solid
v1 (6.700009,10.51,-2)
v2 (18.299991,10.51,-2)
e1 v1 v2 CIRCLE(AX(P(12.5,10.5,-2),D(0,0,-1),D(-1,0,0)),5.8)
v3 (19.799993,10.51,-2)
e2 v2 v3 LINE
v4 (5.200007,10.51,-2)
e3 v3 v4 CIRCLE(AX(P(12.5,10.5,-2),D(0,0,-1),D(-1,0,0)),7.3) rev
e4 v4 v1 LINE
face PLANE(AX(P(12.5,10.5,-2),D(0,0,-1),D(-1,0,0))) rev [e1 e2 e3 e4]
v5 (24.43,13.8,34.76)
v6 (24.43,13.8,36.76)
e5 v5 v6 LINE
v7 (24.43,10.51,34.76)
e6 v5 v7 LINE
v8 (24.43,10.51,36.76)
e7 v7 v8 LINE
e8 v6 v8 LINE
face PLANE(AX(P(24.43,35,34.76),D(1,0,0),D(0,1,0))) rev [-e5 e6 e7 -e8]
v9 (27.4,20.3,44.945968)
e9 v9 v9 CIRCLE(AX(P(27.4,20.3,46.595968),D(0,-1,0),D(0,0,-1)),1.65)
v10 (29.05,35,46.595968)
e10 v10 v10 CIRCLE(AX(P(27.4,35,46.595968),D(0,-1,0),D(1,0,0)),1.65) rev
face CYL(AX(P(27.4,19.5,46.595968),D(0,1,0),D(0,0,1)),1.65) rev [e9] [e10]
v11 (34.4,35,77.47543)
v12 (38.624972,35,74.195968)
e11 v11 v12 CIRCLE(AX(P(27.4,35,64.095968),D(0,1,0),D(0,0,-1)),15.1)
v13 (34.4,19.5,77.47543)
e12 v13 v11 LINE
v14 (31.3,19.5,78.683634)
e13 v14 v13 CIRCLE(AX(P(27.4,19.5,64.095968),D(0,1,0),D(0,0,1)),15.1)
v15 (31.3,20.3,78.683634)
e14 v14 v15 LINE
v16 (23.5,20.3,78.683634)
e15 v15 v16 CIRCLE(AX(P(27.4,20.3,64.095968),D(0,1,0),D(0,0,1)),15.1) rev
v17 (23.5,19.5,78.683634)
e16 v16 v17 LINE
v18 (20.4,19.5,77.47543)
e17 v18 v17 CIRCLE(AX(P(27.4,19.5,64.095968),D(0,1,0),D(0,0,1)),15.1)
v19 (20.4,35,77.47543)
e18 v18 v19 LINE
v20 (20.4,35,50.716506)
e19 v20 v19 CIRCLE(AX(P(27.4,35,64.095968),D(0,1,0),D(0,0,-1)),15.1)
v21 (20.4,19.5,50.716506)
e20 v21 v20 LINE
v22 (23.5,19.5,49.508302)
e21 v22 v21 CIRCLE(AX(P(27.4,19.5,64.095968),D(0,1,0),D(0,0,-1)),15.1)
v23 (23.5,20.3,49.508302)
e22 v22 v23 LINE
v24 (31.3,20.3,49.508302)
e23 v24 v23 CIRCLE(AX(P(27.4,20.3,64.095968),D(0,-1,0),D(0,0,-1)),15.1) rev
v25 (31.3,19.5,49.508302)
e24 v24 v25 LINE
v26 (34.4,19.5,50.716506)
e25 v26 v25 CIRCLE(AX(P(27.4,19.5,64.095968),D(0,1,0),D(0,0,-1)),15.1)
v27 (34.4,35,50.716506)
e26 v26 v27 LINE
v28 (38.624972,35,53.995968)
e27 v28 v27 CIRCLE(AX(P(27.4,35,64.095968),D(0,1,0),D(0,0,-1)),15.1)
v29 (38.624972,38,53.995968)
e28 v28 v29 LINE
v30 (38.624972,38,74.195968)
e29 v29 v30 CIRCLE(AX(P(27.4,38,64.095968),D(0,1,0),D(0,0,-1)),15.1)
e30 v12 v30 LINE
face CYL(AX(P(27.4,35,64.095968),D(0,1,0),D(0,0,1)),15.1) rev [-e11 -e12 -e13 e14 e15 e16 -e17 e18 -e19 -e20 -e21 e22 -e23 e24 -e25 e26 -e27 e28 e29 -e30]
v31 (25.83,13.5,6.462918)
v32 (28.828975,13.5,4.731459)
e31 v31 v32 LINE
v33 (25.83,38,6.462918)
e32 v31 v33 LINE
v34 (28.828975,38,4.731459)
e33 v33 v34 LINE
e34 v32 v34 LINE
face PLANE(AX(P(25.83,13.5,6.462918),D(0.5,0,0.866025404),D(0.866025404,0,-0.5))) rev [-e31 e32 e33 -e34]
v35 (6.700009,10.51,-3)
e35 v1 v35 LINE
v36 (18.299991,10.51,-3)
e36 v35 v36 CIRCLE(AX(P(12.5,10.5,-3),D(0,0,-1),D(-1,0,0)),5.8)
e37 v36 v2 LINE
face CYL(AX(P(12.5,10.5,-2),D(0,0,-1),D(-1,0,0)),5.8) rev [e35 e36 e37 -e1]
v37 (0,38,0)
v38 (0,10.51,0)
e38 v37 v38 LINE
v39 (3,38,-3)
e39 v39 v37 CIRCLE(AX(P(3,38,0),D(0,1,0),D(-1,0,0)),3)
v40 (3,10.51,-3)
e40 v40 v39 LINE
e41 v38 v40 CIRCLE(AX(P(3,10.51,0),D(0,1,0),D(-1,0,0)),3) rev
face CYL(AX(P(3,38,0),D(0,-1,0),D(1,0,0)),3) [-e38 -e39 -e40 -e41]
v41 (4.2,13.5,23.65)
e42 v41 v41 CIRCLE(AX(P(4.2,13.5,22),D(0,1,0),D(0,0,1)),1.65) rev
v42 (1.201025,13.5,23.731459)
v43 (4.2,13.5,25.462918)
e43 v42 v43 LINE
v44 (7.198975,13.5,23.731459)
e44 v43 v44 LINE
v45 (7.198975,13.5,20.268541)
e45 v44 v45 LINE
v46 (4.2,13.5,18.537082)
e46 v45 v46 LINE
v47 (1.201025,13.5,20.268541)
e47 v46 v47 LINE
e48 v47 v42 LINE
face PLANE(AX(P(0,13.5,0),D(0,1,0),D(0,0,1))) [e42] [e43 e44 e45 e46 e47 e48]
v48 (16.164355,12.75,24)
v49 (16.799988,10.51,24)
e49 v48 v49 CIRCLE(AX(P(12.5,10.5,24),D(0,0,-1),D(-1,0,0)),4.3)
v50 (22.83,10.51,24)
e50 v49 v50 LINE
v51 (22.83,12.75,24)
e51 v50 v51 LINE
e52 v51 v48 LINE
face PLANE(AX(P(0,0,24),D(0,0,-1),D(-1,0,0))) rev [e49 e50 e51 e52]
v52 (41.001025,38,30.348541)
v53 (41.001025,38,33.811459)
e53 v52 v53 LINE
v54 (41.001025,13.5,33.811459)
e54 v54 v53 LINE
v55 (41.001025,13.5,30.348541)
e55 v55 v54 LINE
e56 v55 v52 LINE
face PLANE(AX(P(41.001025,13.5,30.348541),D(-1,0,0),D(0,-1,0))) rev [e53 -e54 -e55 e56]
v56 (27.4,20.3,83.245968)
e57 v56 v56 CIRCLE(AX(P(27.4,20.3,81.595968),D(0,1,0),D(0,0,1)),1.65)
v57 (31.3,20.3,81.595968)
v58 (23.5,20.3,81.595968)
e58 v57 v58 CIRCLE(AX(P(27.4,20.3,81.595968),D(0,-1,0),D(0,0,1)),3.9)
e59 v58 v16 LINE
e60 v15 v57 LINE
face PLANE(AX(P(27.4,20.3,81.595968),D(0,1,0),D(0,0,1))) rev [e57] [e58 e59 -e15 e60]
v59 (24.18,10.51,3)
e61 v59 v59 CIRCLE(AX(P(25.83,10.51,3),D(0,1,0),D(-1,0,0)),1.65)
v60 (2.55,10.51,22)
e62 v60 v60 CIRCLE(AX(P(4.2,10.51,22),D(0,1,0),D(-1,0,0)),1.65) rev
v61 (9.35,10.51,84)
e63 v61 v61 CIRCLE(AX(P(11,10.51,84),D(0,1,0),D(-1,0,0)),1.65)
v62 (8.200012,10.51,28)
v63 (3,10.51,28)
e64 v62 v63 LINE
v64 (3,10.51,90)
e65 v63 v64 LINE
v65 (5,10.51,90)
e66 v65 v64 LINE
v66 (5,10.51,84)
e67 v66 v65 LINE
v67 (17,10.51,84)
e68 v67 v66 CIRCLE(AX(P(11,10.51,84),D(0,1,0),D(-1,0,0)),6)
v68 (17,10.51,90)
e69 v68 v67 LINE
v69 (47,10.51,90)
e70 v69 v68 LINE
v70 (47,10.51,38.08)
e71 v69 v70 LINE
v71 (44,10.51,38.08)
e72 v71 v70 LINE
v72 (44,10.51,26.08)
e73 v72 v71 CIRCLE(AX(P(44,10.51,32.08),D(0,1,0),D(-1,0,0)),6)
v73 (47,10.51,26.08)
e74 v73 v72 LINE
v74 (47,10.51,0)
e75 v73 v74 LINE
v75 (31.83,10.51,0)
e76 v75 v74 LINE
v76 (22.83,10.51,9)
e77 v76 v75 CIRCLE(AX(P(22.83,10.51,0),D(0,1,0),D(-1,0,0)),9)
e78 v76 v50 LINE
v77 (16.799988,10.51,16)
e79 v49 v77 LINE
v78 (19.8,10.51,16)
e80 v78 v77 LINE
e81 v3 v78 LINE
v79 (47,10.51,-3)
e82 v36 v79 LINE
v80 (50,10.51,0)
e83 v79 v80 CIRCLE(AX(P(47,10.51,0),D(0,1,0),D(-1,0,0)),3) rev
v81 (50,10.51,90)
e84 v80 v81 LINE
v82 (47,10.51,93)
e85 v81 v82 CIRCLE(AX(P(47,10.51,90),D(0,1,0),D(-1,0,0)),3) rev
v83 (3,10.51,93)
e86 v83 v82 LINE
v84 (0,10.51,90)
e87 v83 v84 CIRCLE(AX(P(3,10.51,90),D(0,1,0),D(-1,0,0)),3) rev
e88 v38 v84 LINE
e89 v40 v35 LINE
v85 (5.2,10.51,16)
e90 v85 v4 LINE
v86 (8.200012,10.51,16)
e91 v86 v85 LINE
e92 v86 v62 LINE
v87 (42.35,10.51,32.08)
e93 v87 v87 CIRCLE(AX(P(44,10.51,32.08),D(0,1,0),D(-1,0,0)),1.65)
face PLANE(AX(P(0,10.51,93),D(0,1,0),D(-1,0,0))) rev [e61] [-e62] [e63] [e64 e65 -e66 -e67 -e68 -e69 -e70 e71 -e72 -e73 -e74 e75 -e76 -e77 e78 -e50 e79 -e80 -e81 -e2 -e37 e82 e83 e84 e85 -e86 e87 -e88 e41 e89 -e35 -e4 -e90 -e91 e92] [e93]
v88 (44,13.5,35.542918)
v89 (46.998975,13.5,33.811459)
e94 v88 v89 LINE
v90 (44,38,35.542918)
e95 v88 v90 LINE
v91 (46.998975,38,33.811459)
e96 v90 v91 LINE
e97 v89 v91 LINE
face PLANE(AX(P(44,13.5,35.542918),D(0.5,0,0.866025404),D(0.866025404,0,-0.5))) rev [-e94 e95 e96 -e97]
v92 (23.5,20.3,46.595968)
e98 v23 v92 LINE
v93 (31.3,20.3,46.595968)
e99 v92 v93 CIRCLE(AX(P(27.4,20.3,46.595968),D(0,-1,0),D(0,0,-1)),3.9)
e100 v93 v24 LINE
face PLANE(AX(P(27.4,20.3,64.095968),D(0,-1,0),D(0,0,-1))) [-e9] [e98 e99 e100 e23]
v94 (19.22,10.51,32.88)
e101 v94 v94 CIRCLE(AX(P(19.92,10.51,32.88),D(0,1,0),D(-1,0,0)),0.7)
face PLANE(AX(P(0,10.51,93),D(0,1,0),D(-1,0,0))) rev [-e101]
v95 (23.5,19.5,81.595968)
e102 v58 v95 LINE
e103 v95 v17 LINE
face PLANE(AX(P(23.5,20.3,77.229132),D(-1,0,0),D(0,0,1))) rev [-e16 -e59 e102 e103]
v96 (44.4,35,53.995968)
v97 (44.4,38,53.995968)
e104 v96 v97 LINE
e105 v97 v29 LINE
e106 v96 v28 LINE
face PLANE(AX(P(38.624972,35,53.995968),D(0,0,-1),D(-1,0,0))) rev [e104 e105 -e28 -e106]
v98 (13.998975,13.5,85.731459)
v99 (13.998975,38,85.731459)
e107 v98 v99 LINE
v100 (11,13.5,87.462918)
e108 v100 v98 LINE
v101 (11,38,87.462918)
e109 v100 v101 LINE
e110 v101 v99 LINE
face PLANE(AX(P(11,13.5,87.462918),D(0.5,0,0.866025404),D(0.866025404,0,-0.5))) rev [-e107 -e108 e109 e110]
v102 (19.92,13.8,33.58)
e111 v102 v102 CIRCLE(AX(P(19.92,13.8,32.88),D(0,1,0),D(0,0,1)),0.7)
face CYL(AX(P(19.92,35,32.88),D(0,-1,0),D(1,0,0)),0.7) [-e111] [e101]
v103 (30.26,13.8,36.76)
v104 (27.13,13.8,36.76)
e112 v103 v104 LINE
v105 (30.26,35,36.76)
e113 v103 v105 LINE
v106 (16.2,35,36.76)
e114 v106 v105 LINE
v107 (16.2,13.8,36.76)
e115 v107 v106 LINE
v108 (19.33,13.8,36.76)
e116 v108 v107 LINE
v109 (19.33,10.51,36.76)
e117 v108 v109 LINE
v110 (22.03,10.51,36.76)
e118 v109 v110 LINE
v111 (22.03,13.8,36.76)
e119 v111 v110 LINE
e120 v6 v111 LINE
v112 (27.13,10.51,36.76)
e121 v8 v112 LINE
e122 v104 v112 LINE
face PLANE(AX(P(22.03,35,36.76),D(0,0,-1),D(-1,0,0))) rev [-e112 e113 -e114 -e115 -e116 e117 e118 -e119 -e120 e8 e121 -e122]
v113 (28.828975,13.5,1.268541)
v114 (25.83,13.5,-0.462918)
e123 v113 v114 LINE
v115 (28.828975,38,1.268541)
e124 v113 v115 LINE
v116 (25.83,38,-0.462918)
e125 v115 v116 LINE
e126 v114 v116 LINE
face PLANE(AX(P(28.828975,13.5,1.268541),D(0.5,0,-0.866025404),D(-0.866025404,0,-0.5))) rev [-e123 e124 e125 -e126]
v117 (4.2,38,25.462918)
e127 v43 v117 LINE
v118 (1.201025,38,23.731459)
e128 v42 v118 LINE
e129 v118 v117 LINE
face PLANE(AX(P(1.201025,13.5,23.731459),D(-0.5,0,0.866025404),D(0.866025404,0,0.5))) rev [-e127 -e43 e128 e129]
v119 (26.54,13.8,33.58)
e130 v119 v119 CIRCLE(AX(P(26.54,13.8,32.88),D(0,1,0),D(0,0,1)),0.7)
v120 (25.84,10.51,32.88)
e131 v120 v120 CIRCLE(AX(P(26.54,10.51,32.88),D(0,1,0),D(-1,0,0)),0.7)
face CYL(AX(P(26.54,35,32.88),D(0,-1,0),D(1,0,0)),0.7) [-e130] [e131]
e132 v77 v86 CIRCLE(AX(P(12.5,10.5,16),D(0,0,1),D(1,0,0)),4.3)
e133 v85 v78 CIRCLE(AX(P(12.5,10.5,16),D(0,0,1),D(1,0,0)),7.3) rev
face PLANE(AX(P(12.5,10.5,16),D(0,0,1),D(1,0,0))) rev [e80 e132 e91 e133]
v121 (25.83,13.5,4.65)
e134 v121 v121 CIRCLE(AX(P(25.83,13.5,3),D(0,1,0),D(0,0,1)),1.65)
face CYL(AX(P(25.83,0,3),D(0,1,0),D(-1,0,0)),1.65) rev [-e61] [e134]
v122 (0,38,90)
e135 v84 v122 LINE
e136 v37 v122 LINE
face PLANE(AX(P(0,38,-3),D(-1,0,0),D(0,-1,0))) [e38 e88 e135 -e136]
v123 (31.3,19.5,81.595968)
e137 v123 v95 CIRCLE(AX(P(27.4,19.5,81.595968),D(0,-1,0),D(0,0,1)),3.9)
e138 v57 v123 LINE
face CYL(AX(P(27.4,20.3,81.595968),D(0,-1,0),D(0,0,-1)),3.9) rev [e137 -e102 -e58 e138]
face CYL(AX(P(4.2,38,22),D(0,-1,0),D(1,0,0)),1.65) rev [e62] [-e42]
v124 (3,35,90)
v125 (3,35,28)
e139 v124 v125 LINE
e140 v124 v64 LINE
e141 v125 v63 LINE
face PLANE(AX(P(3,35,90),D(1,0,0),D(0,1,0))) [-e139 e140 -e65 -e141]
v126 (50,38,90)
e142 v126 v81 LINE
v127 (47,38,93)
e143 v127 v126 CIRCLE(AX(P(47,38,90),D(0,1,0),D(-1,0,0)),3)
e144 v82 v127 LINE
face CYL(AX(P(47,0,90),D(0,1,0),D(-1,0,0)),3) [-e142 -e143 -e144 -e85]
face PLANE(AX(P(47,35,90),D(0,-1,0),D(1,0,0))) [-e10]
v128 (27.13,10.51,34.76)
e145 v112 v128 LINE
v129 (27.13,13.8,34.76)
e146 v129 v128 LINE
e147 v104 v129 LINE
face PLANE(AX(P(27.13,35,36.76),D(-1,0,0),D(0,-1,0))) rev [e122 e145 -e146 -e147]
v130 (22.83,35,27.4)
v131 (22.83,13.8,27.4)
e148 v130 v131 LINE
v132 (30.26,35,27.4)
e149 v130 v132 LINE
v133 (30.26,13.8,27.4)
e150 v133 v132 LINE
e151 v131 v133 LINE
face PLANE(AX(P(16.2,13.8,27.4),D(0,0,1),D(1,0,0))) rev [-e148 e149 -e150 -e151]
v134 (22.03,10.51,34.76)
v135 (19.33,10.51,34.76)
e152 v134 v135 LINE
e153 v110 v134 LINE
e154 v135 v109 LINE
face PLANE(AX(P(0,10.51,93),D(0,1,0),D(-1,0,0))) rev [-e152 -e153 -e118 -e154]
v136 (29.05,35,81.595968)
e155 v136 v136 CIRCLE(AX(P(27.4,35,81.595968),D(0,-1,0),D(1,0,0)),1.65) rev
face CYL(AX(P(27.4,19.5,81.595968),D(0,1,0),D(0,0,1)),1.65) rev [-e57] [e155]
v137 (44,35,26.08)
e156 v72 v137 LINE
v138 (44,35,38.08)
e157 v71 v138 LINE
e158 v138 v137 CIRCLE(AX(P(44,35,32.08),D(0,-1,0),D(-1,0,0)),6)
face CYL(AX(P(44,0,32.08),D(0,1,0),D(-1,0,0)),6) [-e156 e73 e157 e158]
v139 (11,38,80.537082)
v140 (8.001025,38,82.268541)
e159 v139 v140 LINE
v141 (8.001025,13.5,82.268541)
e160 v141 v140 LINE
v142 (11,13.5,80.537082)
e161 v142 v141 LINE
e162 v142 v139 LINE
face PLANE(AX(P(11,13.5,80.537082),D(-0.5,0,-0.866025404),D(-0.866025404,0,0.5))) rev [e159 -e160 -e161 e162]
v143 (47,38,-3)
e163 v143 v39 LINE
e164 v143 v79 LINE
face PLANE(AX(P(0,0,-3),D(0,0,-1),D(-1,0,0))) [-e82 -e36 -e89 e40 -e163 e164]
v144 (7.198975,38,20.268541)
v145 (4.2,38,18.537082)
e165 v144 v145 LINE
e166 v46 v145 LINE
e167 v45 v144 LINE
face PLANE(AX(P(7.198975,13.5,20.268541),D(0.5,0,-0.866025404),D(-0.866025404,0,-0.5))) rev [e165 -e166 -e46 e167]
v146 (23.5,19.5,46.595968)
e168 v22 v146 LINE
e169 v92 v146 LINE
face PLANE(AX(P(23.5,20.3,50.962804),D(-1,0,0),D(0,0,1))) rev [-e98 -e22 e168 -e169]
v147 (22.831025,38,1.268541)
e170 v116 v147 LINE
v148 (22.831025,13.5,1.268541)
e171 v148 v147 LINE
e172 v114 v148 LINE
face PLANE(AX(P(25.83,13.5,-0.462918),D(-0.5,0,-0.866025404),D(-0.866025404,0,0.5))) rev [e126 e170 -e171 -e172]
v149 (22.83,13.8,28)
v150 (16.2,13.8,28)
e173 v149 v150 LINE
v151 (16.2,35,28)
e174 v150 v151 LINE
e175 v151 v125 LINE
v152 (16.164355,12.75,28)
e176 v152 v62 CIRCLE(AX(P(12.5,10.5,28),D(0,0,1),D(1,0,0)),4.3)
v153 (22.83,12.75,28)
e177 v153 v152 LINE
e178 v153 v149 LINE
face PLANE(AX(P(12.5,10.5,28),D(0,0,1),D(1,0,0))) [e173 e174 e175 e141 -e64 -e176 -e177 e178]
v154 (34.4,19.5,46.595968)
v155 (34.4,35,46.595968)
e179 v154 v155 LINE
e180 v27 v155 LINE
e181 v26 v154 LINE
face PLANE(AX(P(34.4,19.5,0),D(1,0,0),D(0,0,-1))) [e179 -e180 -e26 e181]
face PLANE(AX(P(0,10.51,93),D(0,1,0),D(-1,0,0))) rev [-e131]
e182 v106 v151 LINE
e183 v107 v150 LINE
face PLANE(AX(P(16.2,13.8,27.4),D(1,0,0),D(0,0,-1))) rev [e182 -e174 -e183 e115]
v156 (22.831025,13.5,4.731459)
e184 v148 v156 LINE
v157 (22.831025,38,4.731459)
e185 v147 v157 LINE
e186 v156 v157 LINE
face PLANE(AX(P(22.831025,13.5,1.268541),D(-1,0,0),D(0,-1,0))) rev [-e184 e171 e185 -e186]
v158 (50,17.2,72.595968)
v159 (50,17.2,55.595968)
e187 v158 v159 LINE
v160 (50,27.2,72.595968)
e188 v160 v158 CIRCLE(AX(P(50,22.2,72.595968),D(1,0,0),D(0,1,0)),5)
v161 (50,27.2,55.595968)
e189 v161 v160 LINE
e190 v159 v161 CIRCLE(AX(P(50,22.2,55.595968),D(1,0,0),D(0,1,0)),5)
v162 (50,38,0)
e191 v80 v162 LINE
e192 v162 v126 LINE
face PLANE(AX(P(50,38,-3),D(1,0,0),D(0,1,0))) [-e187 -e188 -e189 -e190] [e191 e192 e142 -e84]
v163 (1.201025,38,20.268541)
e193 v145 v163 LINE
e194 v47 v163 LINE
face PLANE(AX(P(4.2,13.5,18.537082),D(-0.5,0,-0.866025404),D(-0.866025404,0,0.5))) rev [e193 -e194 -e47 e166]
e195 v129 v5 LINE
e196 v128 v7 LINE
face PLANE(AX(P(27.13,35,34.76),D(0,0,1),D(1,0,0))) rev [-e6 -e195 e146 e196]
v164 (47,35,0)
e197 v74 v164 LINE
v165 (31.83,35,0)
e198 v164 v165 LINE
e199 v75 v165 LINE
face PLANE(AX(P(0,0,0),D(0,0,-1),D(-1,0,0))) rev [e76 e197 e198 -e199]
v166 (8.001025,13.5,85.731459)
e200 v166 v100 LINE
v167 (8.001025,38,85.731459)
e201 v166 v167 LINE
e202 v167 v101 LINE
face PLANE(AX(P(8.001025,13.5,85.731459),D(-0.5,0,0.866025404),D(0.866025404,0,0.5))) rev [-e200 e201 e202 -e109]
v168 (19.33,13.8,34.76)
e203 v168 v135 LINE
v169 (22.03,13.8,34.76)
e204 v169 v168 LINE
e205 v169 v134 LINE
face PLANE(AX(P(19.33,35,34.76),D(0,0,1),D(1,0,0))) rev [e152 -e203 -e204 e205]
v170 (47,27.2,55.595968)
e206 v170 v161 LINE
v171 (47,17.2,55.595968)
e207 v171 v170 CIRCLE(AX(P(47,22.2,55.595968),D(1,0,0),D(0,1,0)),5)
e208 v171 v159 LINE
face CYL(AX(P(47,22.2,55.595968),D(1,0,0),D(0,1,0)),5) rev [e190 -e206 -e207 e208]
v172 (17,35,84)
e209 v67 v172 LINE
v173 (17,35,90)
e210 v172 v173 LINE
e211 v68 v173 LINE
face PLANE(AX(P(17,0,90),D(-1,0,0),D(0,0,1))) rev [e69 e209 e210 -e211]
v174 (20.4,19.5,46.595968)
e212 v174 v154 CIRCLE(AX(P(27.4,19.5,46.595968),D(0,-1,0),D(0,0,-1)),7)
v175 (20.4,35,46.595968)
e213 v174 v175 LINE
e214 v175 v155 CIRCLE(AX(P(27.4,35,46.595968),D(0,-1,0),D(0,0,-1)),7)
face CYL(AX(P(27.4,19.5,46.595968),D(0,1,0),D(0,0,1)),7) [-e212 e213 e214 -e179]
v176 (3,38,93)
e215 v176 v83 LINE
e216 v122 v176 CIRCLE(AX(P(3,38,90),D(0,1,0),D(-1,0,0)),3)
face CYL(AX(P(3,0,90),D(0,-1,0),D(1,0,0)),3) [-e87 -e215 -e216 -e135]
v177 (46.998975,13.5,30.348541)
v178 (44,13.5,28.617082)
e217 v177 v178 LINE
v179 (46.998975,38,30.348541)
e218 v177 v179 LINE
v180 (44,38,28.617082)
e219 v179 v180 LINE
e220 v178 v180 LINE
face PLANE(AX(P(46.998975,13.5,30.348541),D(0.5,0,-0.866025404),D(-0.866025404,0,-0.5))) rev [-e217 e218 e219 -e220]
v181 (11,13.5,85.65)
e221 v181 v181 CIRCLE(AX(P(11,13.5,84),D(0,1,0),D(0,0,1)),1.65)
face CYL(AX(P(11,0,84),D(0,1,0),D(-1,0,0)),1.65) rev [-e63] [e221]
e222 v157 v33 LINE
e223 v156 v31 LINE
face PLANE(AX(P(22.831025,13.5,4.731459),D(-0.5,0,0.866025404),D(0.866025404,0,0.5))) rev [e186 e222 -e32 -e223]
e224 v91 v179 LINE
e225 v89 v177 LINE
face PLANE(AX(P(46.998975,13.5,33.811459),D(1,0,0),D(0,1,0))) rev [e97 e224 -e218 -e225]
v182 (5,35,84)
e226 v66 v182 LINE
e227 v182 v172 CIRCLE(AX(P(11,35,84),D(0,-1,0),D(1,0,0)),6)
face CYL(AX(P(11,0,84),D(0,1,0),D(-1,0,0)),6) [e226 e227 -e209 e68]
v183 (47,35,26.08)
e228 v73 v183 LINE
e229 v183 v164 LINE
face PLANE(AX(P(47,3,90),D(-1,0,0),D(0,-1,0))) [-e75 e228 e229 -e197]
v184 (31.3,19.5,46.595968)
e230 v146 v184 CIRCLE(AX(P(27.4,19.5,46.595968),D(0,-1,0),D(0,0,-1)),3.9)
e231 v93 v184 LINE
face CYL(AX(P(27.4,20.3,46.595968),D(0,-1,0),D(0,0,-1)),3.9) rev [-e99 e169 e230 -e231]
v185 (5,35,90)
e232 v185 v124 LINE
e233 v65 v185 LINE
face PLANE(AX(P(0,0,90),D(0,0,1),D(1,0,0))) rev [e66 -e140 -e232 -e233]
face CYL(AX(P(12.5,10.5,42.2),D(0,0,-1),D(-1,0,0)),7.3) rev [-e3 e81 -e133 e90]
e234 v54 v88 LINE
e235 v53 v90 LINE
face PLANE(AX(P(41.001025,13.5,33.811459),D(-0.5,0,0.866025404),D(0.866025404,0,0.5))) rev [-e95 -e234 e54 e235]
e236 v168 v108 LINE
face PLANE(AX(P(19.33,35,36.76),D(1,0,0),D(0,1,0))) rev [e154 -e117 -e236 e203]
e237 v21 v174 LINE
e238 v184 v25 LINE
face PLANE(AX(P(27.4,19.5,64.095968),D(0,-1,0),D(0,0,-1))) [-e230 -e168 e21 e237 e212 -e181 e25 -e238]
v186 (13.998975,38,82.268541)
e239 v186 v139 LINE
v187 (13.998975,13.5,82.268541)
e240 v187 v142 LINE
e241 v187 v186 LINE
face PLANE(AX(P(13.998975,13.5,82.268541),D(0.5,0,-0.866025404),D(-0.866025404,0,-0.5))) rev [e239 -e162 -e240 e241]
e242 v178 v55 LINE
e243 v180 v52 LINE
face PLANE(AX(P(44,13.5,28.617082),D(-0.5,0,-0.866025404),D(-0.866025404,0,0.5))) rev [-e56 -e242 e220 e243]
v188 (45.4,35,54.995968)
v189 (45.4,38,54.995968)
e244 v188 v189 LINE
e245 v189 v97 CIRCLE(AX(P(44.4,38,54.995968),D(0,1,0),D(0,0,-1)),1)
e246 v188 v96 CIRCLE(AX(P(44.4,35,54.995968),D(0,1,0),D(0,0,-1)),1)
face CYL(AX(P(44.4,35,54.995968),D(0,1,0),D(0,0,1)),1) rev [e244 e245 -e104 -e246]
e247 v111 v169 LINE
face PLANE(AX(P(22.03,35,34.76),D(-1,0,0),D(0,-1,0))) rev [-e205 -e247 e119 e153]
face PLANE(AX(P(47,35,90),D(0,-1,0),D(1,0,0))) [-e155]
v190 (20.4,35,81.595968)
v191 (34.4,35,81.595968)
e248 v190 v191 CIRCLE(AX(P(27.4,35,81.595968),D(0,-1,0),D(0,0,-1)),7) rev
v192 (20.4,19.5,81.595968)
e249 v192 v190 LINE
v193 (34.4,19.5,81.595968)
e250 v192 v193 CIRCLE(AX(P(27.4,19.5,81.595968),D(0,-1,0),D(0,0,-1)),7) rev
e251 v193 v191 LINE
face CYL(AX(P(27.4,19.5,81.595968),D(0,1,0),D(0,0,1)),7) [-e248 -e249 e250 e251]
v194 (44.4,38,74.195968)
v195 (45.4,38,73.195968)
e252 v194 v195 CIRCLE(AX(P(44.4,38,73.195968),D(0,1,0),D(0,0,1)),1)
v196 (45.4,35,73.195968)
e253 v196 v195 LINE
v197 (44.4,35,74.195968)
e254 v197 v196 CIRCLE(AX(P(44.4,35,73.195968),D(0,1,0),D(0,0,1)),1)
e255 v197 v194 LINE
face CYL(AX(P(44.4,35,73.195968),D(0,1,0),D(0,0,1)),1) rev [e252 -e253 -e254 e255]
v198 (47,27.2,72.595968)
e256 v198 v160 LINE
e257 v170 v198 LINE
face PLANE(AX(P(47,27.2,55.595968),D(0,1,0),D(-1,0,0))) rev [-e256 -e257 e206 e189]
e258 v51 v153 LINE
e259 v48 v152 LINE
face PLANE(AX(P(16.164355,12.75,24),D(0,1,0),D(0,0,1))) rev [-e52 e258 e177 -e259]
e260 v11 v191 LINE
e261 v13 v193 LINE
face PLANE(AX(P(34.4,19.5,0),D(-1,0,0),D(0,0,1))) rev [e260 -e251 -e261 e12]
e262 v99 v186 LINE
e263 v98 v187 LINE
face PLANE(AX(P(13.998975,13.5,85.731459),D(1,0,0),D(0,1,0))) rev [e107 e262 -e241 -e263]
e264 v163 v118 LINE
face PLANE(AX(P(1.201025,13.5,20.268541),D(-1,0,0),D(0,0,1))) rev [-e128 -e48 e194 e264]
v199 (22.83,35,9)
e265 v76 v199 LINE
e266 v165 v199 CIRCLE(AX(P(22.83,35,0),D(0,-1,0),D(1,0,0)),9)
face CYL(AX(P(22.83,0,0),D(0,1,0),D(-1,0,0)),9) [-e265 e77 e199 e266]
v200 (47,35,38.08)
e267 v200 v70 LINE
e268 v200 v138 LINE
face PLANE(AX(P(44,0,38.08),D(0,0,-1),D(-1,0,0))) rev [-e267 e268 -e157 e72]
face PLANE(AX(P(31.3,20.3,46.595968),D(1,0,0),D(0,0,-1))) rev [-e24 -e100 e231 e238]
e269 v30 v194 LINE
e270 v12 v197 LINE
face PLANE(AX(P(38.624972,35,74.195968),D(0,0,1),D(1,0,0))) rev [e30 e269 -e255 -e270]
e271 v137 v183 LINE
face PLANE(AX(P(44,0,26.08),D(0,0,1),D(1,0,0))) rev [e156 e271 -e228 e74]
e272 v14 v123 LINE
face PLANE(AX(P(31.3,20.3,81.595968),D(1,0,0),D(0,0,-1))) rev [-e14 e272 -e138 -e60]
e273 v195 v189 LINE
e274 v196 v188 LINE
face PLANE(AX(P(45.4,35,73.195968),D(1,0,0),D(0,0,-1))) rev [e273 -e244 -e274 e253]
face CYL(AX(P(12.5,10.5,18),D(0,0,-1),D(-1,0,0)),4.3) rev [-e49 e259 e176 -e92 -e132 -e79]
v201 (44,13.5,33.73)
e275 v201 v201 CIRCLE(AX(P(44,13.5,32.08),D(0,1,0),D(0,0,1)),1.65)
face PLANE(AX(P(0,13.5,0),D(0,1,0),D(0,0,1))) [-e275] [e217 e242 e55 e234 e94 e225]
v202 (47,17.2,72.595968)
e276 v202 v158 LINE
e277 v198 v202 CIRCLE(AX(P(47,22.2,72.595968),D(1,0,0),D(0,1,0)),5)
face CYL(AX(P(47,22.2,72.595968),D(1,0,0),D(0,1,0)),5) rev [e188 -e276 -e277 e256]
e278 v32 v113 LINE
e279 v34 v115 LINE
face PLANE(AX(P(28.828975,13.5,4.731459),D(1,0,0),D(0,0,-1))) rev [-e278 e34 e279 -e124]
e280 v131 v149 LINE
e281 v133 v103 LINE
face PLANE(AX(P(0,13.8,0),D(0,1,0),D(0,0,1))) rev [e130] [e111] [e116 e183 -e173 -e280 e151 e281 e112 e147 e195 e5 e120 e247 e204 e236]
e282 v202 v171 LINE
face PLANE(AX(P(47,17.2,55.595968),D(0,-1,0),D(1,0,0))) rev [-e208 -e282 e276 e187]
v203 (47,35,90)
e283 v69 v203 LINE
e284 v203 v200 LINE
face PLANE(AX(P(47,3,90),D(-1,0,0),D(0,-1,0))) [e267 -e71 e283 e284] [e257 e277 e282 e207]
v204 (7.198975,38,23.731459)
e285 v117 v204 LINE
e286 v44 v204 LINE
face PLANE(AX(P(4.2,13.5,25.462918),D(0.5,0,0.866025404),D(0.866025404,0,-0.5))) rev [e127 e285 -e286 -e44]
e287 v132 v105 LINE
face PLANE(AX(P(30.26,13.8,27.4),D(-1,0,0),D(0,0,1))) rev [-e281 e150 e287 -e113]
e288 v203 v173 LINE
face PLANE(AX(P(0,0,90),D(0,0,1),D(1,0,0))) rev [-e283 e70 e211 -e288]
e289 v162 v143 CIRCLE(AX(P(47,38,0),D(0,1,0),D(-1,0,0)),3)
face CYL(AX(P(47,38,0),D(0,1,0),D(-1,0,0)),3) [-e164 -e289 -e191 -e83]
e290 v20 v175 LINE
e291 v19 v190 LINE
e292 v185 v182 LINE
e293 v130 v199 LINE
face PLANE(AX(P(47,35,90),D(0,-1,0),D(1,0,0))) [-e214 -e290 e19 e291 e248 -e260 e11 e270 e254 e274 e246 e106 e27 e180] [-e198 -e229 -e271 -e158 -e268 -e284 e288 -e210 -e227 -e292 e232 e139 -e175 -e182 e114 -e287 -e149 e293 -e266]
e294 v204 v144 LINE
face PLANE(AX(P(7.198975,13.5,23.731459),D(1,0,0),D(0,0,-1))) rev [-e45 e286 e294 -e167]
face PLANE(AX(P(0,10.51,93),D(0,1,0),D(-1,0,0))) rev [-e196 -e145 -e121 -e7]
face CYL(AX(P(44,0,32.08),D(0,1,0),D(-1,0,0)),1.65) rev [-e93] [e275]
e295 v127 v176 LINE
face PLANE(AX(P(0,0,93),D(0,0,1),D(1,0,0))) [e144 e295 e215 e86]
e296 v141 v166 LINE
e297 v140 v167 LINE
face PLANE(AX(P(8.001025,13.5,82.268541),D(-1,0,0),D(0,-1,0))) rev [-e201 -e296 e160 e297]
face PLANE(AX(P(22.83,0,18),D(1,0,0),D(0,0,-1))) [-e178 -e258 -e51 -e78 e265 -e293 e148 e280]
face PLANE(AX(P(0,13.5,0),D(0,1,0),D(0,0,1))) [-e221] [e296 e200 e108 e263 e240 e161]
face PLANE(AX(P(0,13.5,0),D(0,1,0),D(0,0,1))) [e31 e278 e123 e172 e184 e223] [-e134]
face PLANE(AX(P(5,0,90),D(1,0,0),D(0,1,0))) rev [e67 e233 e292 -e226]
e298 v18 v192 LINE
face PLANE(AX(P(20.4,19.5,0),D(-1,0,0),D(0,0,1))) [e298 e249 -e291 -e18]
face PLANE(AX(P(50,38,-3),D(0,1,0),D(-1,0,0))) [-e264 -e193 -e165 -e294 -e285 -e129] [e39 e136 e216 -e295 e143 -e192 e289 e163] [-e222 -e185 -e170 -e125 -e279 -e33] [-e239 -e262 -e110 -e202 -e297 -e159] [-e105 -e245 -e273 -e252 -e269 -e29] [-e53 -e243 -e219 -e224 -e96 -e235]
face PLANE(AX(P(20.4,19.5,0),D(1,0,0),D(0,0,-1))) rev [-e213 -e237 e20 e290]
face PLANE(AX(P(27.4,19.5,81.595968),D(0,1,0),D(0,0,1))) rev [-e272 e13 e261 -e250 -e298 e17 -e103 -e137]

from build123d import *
from build123d.topology import SkipClean

# Parameters (mm, degrees)
SKETCH_1_W               = 50
SKETCH_1_H               = 38
EXTRUDE_1_DEPTH          = 3
SKETCH_2_W               = 50
SKETCH_2_H               = 38
SKETCH_2_W_2             = 44
SKETCH_2_H_2             = 32
EXTRUDE_2_DEPTH          = 90
SKETCH_4_R               = 7.3
CUT_EXTRUDE_1_DEPTH      = 45.2
SKETCH_5_R               = 10.3
SKETCH_5_R_2             = 7.3
EXTRUDE_3_DEPTH          = 16
SKETCH_6_R               = 8.3
SKETCH_6_R_2             = 5.8
EXTRUDE_5_DEPTH          = 1
SKETCH_7_R               = 4.3
EXTRUDE_6_DEPTH          = 2
SKETCH_8_R               = 6.3
SKETCH_8_R_2             = 4.3
EXTRUDE_7_DEPTH          = 10
SKETCH_9_W               = 2.635644668
SKETCH_9_H               = 4.5
CUT_EXTRUDE_2_DEPTH      = 4
SKETCH_10_R              = 0.7
SKETCH_10_W              = 2.7
SKETCH_10_H              = 2
EXTRUDE_8_DEPTH          = 32
SKETCH_11_W              = 14.06
SKETCH_11_H              = 9.36
EXTRUDE_9_DEPTH          = 4.4
SKETCH_12_W              = 14.06
SKETCH_12_H              = 9.36
EXTRUDE_10_DEPTH         = 21.2
CUT_EXTRUDE_3_DEPTH      = 3
SKETCH_14_R              = 1.65
EXTRUDE_11_DEPTH         = 15.5
EXTRUDE_12_DEPTH         = 15.5
CUT_EXTRUDE_4_DEPTH      = 0.8
EXTRUDE_13_DEPTH         = 18
SKETCH_18_W              = 19.83
SKETCH_18_H              = 32
SKETCH_18_R              = 6.3
EXTRUDE_14_DEPTH         = 10
SKETCH_19_W              = 4.445486426
SKETCH_19_H              = 4.5
CUT_EXTRUDE_5_DEPTH      = 4
EXTRUDE_16_REACH         = 110.743
SKETCH_23_R              = 1.65
CUT_EXTRUDE_7_DEPTH      = 109.742815855
CUT_EXTRUDE_7_DEPTH_BACK = 109.742815855
SKETCH_25_R              = 1.65
CUT_EXTRUDE_8_DEPTH      = 24.5
SKETCH_29_W              = 50
SKETCH_29_H              = 38
EXTRUDE_17_DEPTH         = 3
SKETCH_30_W              = 96
SKETCH_30_H              = 0.02
CUT_EXTRUDE_9_DEPTH      = 113.218536793
FILLET_1_R               = 3
CUT_EXTRUDE_10_DEPTH     = 3


with BuildPart() as part:
    # 草图1 → 凸台-拉伸1 (new body)
    with BuildSketch(Plane.XY):
        with Locations((25, 19)):
            Rectangle(SKETCH_1_W, SKETCH_1_H)
    extrude(amount=-EXTRUDE_1_DEPTH)

    # 草图2 → 凸台-拉伸2 (add)
    with BuildSketch(Plane.XY):
        with Locations((25, 19)):
            Rectangle(SKETCH_2_W, SKETCH_2_H)
        with Locations((25, 19)):
            Rectangle(SKETCH_2_W_2, SKETCH_2_H_2, mode=Mode.SUBTRACT)
    extrude(amount=EXTRUDE_2_DEPTH)

    # 草图4 → 切除-拉伸1 (cut)
    with BuildSketch(Plane(origin=(0, 0, -3), x_dir=(-1, 0, 0), z_dir=(0, 0, -1))):
        with Locations((-12.5, 10.5)):
            Circle(SKETCH_4_R)
    extrude(amount=-CUT_EXTRUDE_1_DEPTH, mode=Mode.SUBTRACT)

    # 草图5 → 凸台-拉伸3 (add)
    with BuildSketch(Plane.XY):
        with Locations((12.5, 10.5)):
            Circle(SKETCH_5_R)
        with Locations(Location((12.5, 10.5, 0), (0, 0, 180))):
            Circle(SKETCH_5_R_2, mode=Mode.SUBTRACT)
    extrude(amount=EXTRUDE_3_DEPTH)

    # 草图6 → 凸台-拉伸5 (add)
    with BuildSketch(Plane(origin=(0, 0, -3), x_dir=(-1, 0, 0), z_dir=(0, 0, -1))):
        with Locations((-12.5, 10.5)):
            Circle(SKETCH_6_R)
        with Locations((-12.5, 10.5)):
            Circle(SKETCH_6_R_2, mode=Mode.SUBTRACT)
    extrude(amount=-EXTRUDE_5_DEPTH)

    # 草图7 → 凸台-拉伸6 (add)
    with BuildSketch(Plane.XY.offset(16)):
        with BuildLine():
            Line((5.440254962, 3), (19.559745038, 3))
            ThreePointArc((19.559745038, 3), (18.368221419, 18.964867239), (3, 14.479949748))
            Line((3, 14.479949748), (3, 6.520050252))
            ThreePointArc((3, 6.520050252), (4.035132761, 4.631778581), (5.440254962, 3))
        make_face()
        with Locations((12.5, 10.5)):
            Circle(SKETCH_7_R, mode=Mode.SUBTRACT)
    extrude(amount=EXTRUDE_6_DEPTH)

    # 草图8 → 凸台-拉伸7 (add)
    with BuildSketch(Plane.XY.offset(18)):
        with Locations((12.5, 10.5)):
            Circle(SKETCH_8_R)
        with Locations((12.5, 10.5)):
            Circle(SKETCH_8_R_2, mode=Mode.SUBTRACT)
    extrude(amount=EXTRUDE_7_DEPTH)

    # 草图9 → 切除-拉伸2 (cut)
    with BuildSketch(Plane.XY.offset(28)):
        with Locations((17.482177666, 10.5)):
            Rectangle(SKETCH_9_W, SKETCH_9_H)
    extrude(amount=-CUT_EXTRUDE_2_DEPTH, mode=Mode.SUBTRACT)

    # 草图10 → 凸台-拉伸8 (add)
    with BuildSketch(Plane(origin=(0, 3, 0), x_dir=(1, 0, 0), z_dir=(0, 1, 0))):
        with Locations(Location((19.92, -32.88, 0), (0, 0, 180))):
            Circle(SKETCH_10_R)
        with Locations(Location((26.54, -32.88, 0), (0, 0, 180))):
            Circle(SKETCH_10_R)
        with Locations((20.68, -35.76)):
            Rectangle(SKETCH_10_W, SKETCH_10_H)
        with Locations((25.78, -35.76)):
            Rectangle(SKETCH_10_W, SKETCH_10_H)
    extrude(amount=EXTRUDE_8_DEPTH)

    # 草图11 → 凸台-拉伸9 (add)
    with BuildSketch(Plane(origin=(0, 3, 0), x_dir=(1, 0, 0), z_dir=(0, 1, 0))):
        with Locations((23.23, -32.08)):
            Rectangle(SKETCH_11_W, SKETCH_11_H)
    extrude(amount=EXTRUDE_9_DEPTH)

    # 草图12 → 凸台-拉伸10 (add)
    with BuildSketch(Plane.XZ.offset(-35)):
        with Locations((23.23, 32.08)):
            Rectangle(SKETCH_12_W, SKETCH_12_H)
    extrude(amount=EXTRUDE_10_DEPTH)

    # 草图13 → 切除-拉伸3 (cut)
    with BuildSketch(Plane(origin=(0, 38, 0), x_dir=(1, 0, 0), z_dir=(0, 1, 0))):
        with BuildLine():
            Line((38.62497216, -74.195968058), (44.4, -74.195968058))
            ThreePointArc((44.4, -74.195968058), (45.107106781, -73.903074839), (45.4, -73.195968058))
            Line((45.4, -73.195968058), (45.4, -54.995968058))
            ThreePointArc((45.4, -54.995968058), (45.107106781, -54.288861277), (44.4, -53.995968058))
            Line((44.4, -53.995968058), (38.62497216, -53.995968058))
            ThreePointArc((38.62497216, -53.995968058), (12.3, -64.095968058), (38.62497216, -74.195968058))
        make_face()
    extrude(amount=-CUT_EXTRUDE_3_DEPTH, mode=Mode.SUBTRACT)

    # 草图14 → 凸台-拉伸11 (add)
    # profile 1 of 2: a face of its own
    with SkipClean():  # the faces are left unmerged after this step: merging them gives an invalid solid
        with BuildSketch(Plane.XZ.offset(-35)):
            with BuildLine():
                Line((23.9, 46.595968058), (23.9, 49.407196837))
                ThreePointArc((23.9, 49.407196837), (27.4, 48.995968058), (30.9, 49.407196837))
                Line((30.9, 49.407196837), (30.9, 46.595968058))
                ThreePointArc((30.9, 46.595968058), (27.4, 43.095968058), (23.9, 46.595968058))
            make_face()
            with Locations((27.4, 46.595968058)):
                Circle(SKETCH_14_R, mode=Mode.SUBTRACT)
        # profile 2 of 2: a face of its own
        with BuildSketch(Plane.XZ.offset(-35)):
            with BuildLine():
                Line((30.9, 81.595968058), (30.9, 78.78473928))
                ThreePointArc((30.9, 78.78473928), (27.4, 79.195968058), (23.9, 78.78473928))
                Line((23.9, 78.78473928), (23.9, 81.595968058))
                ThreePointArc((23.9, 81.595968058), (27.4, 85.095968058), (30.9, 81.595968058))
            make_face()
            with Locations(Location((27.4, 81.595968058, 0), (0, 0, 90))):
                Circle(SKETCH_14_R, mode=Mode.SUBTRACT)
        extrude(amount=EXTRUDE_11_DEPTH)

    # 草图15 → 凸台-拉伸12 (add)
    with SkipClean():  # the faces are left unmerged after this step: merging them gives an invalid solid
        with BuildSketch(Plane.XZ.offset(-35)):
            with BuildLine():
                ThreePointArc((23.9, 49.407196837), (22.109340992, 49.953163271), (20.4, 50.716506186))
                Line((20.4, 50.716506186), (20.4, 46.595968058))
                ThreePointArc((20.4, 46.595968058), (27.4, 39.595968058), (34.4, 46.595968058))
                Line((34.4, 46.595968058), (34.4, 50.716506186))
                ThreePointArc((34.4, 50.716506186), (32.690659008, 49.953163271), (30.9, 49.407196837))
                Line((30.9, 49.407196837), (30.9, 46.595968058))
                ThreePointArc((30.9, 46.595968058), (27.4, 43.095968058), (23.9, 46.595968058))
                Line((23.9, 46.595968058), (23.9, 49.407196837))
            make_face()
            with BuildLine():
                Line((20.4, 81.595968058), (20.4, 77.475429931))
                ThreePointArc((20.4, 77.475429931), (22.109340992, 78.238772846), (23.9, 78.78473928))
                Line((23.9, 78.78473928), (23.9, 81.595968058))
                ThreePointArc((23.9, 81.595968058), (27.4, 85.095968058), (30.9, 81.595968058))
                Line((30.9, 81.595968058), (30.9, 78.78473928))
                ThreePointArc((30.9, 78.78473928), (32.690659008, 78.238772846), (34.4, 77.475429931))
                Line((34.4, 77.475429931), (34.4, 81.595968058))
                ThreePointArc((34.4, 81.595968058), (27.4, 88.595968058), (20.4, 81.595968058))
            make_face()
        extrude(amount=EXTRUDE_12_DEPTH)

    # 草图16 → 切除-拉伸4 (cut)
    with SkipClean():  # the faces are left unmerged after this step: merging them gives an invalid solid
        with BuildSketch(Plane.XZ.offset(-19.5)):
            with BuildLine():
                Line((31.3, 81.595968058), (31.3, 77.229132186))
                ThreePointArc((31.3, 77.229132186), (27.4, 77.795968058), (23.5, 77.229132186))
                Line((23.5, 77.229132186), (23.5, 81.595968058))
                ThreePointArc((23.5, 81.595968058), (27.4, 85.495968058), (31.3, 81.595968058))
            make_face()
            with BuildLine():
                Line((31.3, 46.595968058), (31.3, 50.962803931))
                ThreePointArc((31.3, 50.962803931), (27.4, 50.395968058), (23.5, 50.962803931))
                Line((23.5, 50.962803931), (23.5, 46.595968058))
                ThreePointArc((23.5, 46.595968058), (27.4, 42.695968058), (31.3, 46.595968058))
            make_face()
        extrude(amount=-CUT_EXTRUDE_4_DEPTH, mode=Mode.SUBTRACT)

    # 草图17 → 凸台-拉伸13 (add)
    with SkipClean():  # the faces are left unmerged after this step: merging them gives an invalid solid
        with BuildSketch(Plane.XY):
            with BuildLine():
                Line((22.83, 3), (22.83, 10.539153682))
                Line((22.83, 10.539153682), (22.83, 35))
                Line((22.83, 35), (3, 35))
                Line((3, 35), (3, 14.479949748))
                ThreePointArc((3, 14.479949748), (18.368221419, 18.964867239), (19.559745038, 3))
                Line((19.559745038, 3), (22.83, 3))
            make_face()
            with BuildLine():
                Line((5.440254962, 3), (3, 3))
                Line((3, 3), (3, 6.520050252))
                ThreePointArc((3, 6.520050252), (4.035132761, 4.631778581), (5.440254962, 3))
            make_face()
        extrude(amount=EXTRUDE_13_DEPTH)

    # 草图18 → 凸台-拉伸14 (add)
    with SkipClean():  # the faces are left unmerged after this step: merging them gives an invalid solid
        with BuildSketch(Plane.XY.offset(18)):
            with Locations((12.915, 19)):
                Rectangle(SKETCH_18_W, SKETCH_18_H)
            with Locations((12.5, 10.5)):
                Circle(SKETCH_18_R, mode=Mode.SUBTRACT)
        extrude(amount=EXTRUDE_14_DEPTH)

    # 草图19 → 切除-拉伸5 (cut)
    with SkipClean():  # the faces are left unmerged after this step: merging them gives an invalid solid
        with BuildSketch(Plane.XY.offset(28)):
            with Locations((20.607256787, 10.5)):
                Rectangle(SKETCH_19_W, SKETCH_19_H)
        extrude(amount=-CUT_EXTRUDE_5_DEPTH, mode=Mode.SUBTRACT)

    # 草图23 → 凸台-拉伸16 (add, up to next)
    with BuildSketch(Plane.XZ.offset(-35), mode=Mode.PRIVATE) as extrude_16_sk1:
        with BuildLine():
            Line((22.83, 0), (22.83, 9))
            ThreePointArc((22.83, 9), (29.193961031, 6.363961031), (31.83, 0))
            Line((31.83, 0), (22.83, 0))
        make_face()
        with Locations(Location((25.83, 3, 0), (0, 0, 180))):
            Circle(SKETCH_23_R, mode=Mode.SUBTRACT)
    extrude_16_tool1 = extrude(extrude_16_sk1.sketch, amount=EXTRUDE_16_REACH, mode=Mode.PRIVATE) - part.part
    # 草图23 → 凸台-拉伸16 (add, up to next)
    with BuildSketch(Plane.XZ.offset(-35), mode=Mode.PRIVATE) as extrude_16_sk2:
        with BuildLine():
            Line((44, 26.08), (47, 26.08))
            Line((47, 26.08), (47, 38.08))
            Line((47, 38.08), (44, 38.08))
            ThreePointArc((44, 38.08), (38, 32.08), (44, 26.08))
        make_face()
        with Locations(Location((44, 32.08, 0), (0, 0, 180))):
            Circle(SKETCH_23_R, mode=Mode.SUBTRACT)
    extrude_16_tool2 = extrude(extrude_16_sk2.sketch, amount=EXTRUDE_16_REACH, mode=Mode.PRIVATE) - part.part
    # 草图23 → 凸台-拉伸16 (add, up to next)
    with BuildSketch(Plane.XZ.offset(-35), mode=Mode.PRIVATE) as extrude_16_sk3:
        with BuildLine():
            Line((5, 90), (5, 84))
            ThreePointArc((5, 84), (11, 78), (17, 84))
            Line((17, 84), (17, 90))
            Line((17, 90), (5, 90))
        make_face()
        with Locations(Location((11, 84, 0), (0, 0, 180))):
            Circle(SKETCH_23_R, mode=Mode.SUBTRACT)
    extrude_16_tool3 = extrude(extrude_16_sk3.sketch, amount=EXTRUDE_16_REACH, mode=Mode.PRIVATE) - part.part
    add(extrude_16_tool1.solids().sort_by_distance((27.33, 35, 0.127279))[0])
    add(extrude_16_tool2.solids().sort_by_distance((45.5, 35, 26.23))[0])
    add(extrude_16_tool3.solids().sort_by_distance((11, 35, 78.169706))[0])

    # 草图25 → 切除-拉伸7 (cut, two sides: drawn at the far end of the back side and taken through both)
    with BuildSketch(Plane.XZ.offset(-35).offset(-CUT_EXTRUDE_7_DEPTH_BACK)):
        with Locations((4.2, 22)):
            Circle(SKETCH_25_R)
        with Locations((25.83, 3)):
            Circle(SKETCH_25_R)
        with Locations((44, 32.08)):
            Circle(SKETCH_25_R)
        with Locations((11, 84)):
            Circle(SKETCH_25_R)
    extrude(amount=CUT_EXTRUDE_7_DEPTH + CUT_EXTRUDE_7_DEPTH_BACK, mode=Mode.SUBTRACT)

    # 草图26 → 切除-拉伸8 (cut)
    with SkipClean():  # the faces are left unmerged after this step: merging them gives an invalid solid
        with BuildSketch(Plane(origin=(0, 38, 0), x_dir=(1, 0, 0), z_dir=(0, 1, 0))):
            Polygon((4.2, -18.537081721), (1.201024799, -20.268540861), (1.201024799, -23.731459139), (4.2, -25.462918279), (7.198975201, -23.731459139), (7.198975201, -20.268540861), align=None)
            Polygon((25.83, -6.462918279), (28.828975201, -4.731459139), (28.828975201, -1.268540861), (25.83, 0.462918279), (22.831024799, -1.268540861), (22.831024799, -4.731459139), align=None)
            Polygon((11, -80.537081721), (8.001024799, -82.268540861), (8.001024799, -85.731459139), (11, -87.462918279), (13.998975201, -85.731459139), (13.998975201, -82.268540861), align=None)
            Polygon((44, -28.617081721), (41.001024799, -30.348540861), (41.001024799, -33.811459139), (44, -35.542918279), (46.998975201, -33.811459139), (46.998975201, -30.348540861), align=None)
        extrude(amount=-CUT_EXTRUDE_8_DEPTH, mode=Mode.SUBTRACT)

    # 草图29 → 凸台-拉伸17 (add)
    with SkipClean():  # the faces are left unmerged after this step: merging them gives an invalid solid
        with BuildSketch(Plane.XY.offset(90)):
            with Locations((25, 19)):
                Rectangle(SKETCH_29_W, SKETCH_29_H)
        extrude(amount=EXTRUDE_17_DEPTH)

    # 草图30 → 切除-拉伸9 (cut, through all)
    with SkipClean():  # the faces are left unmerged after this step: merging them gives an invalid solid
        with BuildSketch(Plane(origin=(50, 0, 0), x_dir=(0, 0, -1), z_dir=(1, 0, 0))):
            with Locations((-45, 10.5)):
                Rectangle(SKETCH_30_W, SKETCH_30_H)
        extrude(amount=-CUT_EXTRUDE_9_DEPTH, mode=Mode.SUBTRACT)


with BuildPart() as cut_extrude_9_piece_1:
    # of the separate pieces the step leaves, piece 1, a body of its own (cut_extrude_9_pieces)
    add(part.part.solids().sort_by_distance((50, 38, -3))[0])

    # 圆角1
    fillet_1_edges = [cut_extrude_9_piece_1.edges().sort_by_distance(p)[0] for p in [
        (0, 24.255, 93),
        (50, 24.255, -3),
        (0, 24.255, -3),
        (50, 24.255, 93),
    ]]
    fillet(fillet_1_edges, radius=FILLET_1_R - 0.0001)  # a hair under: the kernel refuses the full size

    # 草图33 → 切除-拉伸10 (cut)
    with BuildSketch(Plane(origin=(50, 0, 0), x_dir=(0, 0, -1), z_dir=(1, 0, 0))):
        with BuildLine():
            Line((-55.595968058, 17.2), (-72.595968058, 17.2))
            ThreePointArc((-72.595968058, 17.2), (-77.595968058, 22.2), (-72.595968058, 27.2))
            Line((-72.595968058, 27.2), (-55.595968058, 27.2))
            ThreePointArc((-55.595968058, 27.2), (-50.595968058, 22.2), (-55.595968058, 17.2))
        make_face()
    extrude(amount=-CUT_EXTRUDE_10_DEPTH, mode=Mode.SUBTRACT)


with BuildPart() as cut_extrude_9_piece_2:
    # of the separate pieces the step leaves, piece 2, a body of its own (cut_extrude_9_pieces)
    add(part.part.solids().sort_by_distance((50, 0, -3))[0])


solid = cut_extrude_9_piece_1.part
